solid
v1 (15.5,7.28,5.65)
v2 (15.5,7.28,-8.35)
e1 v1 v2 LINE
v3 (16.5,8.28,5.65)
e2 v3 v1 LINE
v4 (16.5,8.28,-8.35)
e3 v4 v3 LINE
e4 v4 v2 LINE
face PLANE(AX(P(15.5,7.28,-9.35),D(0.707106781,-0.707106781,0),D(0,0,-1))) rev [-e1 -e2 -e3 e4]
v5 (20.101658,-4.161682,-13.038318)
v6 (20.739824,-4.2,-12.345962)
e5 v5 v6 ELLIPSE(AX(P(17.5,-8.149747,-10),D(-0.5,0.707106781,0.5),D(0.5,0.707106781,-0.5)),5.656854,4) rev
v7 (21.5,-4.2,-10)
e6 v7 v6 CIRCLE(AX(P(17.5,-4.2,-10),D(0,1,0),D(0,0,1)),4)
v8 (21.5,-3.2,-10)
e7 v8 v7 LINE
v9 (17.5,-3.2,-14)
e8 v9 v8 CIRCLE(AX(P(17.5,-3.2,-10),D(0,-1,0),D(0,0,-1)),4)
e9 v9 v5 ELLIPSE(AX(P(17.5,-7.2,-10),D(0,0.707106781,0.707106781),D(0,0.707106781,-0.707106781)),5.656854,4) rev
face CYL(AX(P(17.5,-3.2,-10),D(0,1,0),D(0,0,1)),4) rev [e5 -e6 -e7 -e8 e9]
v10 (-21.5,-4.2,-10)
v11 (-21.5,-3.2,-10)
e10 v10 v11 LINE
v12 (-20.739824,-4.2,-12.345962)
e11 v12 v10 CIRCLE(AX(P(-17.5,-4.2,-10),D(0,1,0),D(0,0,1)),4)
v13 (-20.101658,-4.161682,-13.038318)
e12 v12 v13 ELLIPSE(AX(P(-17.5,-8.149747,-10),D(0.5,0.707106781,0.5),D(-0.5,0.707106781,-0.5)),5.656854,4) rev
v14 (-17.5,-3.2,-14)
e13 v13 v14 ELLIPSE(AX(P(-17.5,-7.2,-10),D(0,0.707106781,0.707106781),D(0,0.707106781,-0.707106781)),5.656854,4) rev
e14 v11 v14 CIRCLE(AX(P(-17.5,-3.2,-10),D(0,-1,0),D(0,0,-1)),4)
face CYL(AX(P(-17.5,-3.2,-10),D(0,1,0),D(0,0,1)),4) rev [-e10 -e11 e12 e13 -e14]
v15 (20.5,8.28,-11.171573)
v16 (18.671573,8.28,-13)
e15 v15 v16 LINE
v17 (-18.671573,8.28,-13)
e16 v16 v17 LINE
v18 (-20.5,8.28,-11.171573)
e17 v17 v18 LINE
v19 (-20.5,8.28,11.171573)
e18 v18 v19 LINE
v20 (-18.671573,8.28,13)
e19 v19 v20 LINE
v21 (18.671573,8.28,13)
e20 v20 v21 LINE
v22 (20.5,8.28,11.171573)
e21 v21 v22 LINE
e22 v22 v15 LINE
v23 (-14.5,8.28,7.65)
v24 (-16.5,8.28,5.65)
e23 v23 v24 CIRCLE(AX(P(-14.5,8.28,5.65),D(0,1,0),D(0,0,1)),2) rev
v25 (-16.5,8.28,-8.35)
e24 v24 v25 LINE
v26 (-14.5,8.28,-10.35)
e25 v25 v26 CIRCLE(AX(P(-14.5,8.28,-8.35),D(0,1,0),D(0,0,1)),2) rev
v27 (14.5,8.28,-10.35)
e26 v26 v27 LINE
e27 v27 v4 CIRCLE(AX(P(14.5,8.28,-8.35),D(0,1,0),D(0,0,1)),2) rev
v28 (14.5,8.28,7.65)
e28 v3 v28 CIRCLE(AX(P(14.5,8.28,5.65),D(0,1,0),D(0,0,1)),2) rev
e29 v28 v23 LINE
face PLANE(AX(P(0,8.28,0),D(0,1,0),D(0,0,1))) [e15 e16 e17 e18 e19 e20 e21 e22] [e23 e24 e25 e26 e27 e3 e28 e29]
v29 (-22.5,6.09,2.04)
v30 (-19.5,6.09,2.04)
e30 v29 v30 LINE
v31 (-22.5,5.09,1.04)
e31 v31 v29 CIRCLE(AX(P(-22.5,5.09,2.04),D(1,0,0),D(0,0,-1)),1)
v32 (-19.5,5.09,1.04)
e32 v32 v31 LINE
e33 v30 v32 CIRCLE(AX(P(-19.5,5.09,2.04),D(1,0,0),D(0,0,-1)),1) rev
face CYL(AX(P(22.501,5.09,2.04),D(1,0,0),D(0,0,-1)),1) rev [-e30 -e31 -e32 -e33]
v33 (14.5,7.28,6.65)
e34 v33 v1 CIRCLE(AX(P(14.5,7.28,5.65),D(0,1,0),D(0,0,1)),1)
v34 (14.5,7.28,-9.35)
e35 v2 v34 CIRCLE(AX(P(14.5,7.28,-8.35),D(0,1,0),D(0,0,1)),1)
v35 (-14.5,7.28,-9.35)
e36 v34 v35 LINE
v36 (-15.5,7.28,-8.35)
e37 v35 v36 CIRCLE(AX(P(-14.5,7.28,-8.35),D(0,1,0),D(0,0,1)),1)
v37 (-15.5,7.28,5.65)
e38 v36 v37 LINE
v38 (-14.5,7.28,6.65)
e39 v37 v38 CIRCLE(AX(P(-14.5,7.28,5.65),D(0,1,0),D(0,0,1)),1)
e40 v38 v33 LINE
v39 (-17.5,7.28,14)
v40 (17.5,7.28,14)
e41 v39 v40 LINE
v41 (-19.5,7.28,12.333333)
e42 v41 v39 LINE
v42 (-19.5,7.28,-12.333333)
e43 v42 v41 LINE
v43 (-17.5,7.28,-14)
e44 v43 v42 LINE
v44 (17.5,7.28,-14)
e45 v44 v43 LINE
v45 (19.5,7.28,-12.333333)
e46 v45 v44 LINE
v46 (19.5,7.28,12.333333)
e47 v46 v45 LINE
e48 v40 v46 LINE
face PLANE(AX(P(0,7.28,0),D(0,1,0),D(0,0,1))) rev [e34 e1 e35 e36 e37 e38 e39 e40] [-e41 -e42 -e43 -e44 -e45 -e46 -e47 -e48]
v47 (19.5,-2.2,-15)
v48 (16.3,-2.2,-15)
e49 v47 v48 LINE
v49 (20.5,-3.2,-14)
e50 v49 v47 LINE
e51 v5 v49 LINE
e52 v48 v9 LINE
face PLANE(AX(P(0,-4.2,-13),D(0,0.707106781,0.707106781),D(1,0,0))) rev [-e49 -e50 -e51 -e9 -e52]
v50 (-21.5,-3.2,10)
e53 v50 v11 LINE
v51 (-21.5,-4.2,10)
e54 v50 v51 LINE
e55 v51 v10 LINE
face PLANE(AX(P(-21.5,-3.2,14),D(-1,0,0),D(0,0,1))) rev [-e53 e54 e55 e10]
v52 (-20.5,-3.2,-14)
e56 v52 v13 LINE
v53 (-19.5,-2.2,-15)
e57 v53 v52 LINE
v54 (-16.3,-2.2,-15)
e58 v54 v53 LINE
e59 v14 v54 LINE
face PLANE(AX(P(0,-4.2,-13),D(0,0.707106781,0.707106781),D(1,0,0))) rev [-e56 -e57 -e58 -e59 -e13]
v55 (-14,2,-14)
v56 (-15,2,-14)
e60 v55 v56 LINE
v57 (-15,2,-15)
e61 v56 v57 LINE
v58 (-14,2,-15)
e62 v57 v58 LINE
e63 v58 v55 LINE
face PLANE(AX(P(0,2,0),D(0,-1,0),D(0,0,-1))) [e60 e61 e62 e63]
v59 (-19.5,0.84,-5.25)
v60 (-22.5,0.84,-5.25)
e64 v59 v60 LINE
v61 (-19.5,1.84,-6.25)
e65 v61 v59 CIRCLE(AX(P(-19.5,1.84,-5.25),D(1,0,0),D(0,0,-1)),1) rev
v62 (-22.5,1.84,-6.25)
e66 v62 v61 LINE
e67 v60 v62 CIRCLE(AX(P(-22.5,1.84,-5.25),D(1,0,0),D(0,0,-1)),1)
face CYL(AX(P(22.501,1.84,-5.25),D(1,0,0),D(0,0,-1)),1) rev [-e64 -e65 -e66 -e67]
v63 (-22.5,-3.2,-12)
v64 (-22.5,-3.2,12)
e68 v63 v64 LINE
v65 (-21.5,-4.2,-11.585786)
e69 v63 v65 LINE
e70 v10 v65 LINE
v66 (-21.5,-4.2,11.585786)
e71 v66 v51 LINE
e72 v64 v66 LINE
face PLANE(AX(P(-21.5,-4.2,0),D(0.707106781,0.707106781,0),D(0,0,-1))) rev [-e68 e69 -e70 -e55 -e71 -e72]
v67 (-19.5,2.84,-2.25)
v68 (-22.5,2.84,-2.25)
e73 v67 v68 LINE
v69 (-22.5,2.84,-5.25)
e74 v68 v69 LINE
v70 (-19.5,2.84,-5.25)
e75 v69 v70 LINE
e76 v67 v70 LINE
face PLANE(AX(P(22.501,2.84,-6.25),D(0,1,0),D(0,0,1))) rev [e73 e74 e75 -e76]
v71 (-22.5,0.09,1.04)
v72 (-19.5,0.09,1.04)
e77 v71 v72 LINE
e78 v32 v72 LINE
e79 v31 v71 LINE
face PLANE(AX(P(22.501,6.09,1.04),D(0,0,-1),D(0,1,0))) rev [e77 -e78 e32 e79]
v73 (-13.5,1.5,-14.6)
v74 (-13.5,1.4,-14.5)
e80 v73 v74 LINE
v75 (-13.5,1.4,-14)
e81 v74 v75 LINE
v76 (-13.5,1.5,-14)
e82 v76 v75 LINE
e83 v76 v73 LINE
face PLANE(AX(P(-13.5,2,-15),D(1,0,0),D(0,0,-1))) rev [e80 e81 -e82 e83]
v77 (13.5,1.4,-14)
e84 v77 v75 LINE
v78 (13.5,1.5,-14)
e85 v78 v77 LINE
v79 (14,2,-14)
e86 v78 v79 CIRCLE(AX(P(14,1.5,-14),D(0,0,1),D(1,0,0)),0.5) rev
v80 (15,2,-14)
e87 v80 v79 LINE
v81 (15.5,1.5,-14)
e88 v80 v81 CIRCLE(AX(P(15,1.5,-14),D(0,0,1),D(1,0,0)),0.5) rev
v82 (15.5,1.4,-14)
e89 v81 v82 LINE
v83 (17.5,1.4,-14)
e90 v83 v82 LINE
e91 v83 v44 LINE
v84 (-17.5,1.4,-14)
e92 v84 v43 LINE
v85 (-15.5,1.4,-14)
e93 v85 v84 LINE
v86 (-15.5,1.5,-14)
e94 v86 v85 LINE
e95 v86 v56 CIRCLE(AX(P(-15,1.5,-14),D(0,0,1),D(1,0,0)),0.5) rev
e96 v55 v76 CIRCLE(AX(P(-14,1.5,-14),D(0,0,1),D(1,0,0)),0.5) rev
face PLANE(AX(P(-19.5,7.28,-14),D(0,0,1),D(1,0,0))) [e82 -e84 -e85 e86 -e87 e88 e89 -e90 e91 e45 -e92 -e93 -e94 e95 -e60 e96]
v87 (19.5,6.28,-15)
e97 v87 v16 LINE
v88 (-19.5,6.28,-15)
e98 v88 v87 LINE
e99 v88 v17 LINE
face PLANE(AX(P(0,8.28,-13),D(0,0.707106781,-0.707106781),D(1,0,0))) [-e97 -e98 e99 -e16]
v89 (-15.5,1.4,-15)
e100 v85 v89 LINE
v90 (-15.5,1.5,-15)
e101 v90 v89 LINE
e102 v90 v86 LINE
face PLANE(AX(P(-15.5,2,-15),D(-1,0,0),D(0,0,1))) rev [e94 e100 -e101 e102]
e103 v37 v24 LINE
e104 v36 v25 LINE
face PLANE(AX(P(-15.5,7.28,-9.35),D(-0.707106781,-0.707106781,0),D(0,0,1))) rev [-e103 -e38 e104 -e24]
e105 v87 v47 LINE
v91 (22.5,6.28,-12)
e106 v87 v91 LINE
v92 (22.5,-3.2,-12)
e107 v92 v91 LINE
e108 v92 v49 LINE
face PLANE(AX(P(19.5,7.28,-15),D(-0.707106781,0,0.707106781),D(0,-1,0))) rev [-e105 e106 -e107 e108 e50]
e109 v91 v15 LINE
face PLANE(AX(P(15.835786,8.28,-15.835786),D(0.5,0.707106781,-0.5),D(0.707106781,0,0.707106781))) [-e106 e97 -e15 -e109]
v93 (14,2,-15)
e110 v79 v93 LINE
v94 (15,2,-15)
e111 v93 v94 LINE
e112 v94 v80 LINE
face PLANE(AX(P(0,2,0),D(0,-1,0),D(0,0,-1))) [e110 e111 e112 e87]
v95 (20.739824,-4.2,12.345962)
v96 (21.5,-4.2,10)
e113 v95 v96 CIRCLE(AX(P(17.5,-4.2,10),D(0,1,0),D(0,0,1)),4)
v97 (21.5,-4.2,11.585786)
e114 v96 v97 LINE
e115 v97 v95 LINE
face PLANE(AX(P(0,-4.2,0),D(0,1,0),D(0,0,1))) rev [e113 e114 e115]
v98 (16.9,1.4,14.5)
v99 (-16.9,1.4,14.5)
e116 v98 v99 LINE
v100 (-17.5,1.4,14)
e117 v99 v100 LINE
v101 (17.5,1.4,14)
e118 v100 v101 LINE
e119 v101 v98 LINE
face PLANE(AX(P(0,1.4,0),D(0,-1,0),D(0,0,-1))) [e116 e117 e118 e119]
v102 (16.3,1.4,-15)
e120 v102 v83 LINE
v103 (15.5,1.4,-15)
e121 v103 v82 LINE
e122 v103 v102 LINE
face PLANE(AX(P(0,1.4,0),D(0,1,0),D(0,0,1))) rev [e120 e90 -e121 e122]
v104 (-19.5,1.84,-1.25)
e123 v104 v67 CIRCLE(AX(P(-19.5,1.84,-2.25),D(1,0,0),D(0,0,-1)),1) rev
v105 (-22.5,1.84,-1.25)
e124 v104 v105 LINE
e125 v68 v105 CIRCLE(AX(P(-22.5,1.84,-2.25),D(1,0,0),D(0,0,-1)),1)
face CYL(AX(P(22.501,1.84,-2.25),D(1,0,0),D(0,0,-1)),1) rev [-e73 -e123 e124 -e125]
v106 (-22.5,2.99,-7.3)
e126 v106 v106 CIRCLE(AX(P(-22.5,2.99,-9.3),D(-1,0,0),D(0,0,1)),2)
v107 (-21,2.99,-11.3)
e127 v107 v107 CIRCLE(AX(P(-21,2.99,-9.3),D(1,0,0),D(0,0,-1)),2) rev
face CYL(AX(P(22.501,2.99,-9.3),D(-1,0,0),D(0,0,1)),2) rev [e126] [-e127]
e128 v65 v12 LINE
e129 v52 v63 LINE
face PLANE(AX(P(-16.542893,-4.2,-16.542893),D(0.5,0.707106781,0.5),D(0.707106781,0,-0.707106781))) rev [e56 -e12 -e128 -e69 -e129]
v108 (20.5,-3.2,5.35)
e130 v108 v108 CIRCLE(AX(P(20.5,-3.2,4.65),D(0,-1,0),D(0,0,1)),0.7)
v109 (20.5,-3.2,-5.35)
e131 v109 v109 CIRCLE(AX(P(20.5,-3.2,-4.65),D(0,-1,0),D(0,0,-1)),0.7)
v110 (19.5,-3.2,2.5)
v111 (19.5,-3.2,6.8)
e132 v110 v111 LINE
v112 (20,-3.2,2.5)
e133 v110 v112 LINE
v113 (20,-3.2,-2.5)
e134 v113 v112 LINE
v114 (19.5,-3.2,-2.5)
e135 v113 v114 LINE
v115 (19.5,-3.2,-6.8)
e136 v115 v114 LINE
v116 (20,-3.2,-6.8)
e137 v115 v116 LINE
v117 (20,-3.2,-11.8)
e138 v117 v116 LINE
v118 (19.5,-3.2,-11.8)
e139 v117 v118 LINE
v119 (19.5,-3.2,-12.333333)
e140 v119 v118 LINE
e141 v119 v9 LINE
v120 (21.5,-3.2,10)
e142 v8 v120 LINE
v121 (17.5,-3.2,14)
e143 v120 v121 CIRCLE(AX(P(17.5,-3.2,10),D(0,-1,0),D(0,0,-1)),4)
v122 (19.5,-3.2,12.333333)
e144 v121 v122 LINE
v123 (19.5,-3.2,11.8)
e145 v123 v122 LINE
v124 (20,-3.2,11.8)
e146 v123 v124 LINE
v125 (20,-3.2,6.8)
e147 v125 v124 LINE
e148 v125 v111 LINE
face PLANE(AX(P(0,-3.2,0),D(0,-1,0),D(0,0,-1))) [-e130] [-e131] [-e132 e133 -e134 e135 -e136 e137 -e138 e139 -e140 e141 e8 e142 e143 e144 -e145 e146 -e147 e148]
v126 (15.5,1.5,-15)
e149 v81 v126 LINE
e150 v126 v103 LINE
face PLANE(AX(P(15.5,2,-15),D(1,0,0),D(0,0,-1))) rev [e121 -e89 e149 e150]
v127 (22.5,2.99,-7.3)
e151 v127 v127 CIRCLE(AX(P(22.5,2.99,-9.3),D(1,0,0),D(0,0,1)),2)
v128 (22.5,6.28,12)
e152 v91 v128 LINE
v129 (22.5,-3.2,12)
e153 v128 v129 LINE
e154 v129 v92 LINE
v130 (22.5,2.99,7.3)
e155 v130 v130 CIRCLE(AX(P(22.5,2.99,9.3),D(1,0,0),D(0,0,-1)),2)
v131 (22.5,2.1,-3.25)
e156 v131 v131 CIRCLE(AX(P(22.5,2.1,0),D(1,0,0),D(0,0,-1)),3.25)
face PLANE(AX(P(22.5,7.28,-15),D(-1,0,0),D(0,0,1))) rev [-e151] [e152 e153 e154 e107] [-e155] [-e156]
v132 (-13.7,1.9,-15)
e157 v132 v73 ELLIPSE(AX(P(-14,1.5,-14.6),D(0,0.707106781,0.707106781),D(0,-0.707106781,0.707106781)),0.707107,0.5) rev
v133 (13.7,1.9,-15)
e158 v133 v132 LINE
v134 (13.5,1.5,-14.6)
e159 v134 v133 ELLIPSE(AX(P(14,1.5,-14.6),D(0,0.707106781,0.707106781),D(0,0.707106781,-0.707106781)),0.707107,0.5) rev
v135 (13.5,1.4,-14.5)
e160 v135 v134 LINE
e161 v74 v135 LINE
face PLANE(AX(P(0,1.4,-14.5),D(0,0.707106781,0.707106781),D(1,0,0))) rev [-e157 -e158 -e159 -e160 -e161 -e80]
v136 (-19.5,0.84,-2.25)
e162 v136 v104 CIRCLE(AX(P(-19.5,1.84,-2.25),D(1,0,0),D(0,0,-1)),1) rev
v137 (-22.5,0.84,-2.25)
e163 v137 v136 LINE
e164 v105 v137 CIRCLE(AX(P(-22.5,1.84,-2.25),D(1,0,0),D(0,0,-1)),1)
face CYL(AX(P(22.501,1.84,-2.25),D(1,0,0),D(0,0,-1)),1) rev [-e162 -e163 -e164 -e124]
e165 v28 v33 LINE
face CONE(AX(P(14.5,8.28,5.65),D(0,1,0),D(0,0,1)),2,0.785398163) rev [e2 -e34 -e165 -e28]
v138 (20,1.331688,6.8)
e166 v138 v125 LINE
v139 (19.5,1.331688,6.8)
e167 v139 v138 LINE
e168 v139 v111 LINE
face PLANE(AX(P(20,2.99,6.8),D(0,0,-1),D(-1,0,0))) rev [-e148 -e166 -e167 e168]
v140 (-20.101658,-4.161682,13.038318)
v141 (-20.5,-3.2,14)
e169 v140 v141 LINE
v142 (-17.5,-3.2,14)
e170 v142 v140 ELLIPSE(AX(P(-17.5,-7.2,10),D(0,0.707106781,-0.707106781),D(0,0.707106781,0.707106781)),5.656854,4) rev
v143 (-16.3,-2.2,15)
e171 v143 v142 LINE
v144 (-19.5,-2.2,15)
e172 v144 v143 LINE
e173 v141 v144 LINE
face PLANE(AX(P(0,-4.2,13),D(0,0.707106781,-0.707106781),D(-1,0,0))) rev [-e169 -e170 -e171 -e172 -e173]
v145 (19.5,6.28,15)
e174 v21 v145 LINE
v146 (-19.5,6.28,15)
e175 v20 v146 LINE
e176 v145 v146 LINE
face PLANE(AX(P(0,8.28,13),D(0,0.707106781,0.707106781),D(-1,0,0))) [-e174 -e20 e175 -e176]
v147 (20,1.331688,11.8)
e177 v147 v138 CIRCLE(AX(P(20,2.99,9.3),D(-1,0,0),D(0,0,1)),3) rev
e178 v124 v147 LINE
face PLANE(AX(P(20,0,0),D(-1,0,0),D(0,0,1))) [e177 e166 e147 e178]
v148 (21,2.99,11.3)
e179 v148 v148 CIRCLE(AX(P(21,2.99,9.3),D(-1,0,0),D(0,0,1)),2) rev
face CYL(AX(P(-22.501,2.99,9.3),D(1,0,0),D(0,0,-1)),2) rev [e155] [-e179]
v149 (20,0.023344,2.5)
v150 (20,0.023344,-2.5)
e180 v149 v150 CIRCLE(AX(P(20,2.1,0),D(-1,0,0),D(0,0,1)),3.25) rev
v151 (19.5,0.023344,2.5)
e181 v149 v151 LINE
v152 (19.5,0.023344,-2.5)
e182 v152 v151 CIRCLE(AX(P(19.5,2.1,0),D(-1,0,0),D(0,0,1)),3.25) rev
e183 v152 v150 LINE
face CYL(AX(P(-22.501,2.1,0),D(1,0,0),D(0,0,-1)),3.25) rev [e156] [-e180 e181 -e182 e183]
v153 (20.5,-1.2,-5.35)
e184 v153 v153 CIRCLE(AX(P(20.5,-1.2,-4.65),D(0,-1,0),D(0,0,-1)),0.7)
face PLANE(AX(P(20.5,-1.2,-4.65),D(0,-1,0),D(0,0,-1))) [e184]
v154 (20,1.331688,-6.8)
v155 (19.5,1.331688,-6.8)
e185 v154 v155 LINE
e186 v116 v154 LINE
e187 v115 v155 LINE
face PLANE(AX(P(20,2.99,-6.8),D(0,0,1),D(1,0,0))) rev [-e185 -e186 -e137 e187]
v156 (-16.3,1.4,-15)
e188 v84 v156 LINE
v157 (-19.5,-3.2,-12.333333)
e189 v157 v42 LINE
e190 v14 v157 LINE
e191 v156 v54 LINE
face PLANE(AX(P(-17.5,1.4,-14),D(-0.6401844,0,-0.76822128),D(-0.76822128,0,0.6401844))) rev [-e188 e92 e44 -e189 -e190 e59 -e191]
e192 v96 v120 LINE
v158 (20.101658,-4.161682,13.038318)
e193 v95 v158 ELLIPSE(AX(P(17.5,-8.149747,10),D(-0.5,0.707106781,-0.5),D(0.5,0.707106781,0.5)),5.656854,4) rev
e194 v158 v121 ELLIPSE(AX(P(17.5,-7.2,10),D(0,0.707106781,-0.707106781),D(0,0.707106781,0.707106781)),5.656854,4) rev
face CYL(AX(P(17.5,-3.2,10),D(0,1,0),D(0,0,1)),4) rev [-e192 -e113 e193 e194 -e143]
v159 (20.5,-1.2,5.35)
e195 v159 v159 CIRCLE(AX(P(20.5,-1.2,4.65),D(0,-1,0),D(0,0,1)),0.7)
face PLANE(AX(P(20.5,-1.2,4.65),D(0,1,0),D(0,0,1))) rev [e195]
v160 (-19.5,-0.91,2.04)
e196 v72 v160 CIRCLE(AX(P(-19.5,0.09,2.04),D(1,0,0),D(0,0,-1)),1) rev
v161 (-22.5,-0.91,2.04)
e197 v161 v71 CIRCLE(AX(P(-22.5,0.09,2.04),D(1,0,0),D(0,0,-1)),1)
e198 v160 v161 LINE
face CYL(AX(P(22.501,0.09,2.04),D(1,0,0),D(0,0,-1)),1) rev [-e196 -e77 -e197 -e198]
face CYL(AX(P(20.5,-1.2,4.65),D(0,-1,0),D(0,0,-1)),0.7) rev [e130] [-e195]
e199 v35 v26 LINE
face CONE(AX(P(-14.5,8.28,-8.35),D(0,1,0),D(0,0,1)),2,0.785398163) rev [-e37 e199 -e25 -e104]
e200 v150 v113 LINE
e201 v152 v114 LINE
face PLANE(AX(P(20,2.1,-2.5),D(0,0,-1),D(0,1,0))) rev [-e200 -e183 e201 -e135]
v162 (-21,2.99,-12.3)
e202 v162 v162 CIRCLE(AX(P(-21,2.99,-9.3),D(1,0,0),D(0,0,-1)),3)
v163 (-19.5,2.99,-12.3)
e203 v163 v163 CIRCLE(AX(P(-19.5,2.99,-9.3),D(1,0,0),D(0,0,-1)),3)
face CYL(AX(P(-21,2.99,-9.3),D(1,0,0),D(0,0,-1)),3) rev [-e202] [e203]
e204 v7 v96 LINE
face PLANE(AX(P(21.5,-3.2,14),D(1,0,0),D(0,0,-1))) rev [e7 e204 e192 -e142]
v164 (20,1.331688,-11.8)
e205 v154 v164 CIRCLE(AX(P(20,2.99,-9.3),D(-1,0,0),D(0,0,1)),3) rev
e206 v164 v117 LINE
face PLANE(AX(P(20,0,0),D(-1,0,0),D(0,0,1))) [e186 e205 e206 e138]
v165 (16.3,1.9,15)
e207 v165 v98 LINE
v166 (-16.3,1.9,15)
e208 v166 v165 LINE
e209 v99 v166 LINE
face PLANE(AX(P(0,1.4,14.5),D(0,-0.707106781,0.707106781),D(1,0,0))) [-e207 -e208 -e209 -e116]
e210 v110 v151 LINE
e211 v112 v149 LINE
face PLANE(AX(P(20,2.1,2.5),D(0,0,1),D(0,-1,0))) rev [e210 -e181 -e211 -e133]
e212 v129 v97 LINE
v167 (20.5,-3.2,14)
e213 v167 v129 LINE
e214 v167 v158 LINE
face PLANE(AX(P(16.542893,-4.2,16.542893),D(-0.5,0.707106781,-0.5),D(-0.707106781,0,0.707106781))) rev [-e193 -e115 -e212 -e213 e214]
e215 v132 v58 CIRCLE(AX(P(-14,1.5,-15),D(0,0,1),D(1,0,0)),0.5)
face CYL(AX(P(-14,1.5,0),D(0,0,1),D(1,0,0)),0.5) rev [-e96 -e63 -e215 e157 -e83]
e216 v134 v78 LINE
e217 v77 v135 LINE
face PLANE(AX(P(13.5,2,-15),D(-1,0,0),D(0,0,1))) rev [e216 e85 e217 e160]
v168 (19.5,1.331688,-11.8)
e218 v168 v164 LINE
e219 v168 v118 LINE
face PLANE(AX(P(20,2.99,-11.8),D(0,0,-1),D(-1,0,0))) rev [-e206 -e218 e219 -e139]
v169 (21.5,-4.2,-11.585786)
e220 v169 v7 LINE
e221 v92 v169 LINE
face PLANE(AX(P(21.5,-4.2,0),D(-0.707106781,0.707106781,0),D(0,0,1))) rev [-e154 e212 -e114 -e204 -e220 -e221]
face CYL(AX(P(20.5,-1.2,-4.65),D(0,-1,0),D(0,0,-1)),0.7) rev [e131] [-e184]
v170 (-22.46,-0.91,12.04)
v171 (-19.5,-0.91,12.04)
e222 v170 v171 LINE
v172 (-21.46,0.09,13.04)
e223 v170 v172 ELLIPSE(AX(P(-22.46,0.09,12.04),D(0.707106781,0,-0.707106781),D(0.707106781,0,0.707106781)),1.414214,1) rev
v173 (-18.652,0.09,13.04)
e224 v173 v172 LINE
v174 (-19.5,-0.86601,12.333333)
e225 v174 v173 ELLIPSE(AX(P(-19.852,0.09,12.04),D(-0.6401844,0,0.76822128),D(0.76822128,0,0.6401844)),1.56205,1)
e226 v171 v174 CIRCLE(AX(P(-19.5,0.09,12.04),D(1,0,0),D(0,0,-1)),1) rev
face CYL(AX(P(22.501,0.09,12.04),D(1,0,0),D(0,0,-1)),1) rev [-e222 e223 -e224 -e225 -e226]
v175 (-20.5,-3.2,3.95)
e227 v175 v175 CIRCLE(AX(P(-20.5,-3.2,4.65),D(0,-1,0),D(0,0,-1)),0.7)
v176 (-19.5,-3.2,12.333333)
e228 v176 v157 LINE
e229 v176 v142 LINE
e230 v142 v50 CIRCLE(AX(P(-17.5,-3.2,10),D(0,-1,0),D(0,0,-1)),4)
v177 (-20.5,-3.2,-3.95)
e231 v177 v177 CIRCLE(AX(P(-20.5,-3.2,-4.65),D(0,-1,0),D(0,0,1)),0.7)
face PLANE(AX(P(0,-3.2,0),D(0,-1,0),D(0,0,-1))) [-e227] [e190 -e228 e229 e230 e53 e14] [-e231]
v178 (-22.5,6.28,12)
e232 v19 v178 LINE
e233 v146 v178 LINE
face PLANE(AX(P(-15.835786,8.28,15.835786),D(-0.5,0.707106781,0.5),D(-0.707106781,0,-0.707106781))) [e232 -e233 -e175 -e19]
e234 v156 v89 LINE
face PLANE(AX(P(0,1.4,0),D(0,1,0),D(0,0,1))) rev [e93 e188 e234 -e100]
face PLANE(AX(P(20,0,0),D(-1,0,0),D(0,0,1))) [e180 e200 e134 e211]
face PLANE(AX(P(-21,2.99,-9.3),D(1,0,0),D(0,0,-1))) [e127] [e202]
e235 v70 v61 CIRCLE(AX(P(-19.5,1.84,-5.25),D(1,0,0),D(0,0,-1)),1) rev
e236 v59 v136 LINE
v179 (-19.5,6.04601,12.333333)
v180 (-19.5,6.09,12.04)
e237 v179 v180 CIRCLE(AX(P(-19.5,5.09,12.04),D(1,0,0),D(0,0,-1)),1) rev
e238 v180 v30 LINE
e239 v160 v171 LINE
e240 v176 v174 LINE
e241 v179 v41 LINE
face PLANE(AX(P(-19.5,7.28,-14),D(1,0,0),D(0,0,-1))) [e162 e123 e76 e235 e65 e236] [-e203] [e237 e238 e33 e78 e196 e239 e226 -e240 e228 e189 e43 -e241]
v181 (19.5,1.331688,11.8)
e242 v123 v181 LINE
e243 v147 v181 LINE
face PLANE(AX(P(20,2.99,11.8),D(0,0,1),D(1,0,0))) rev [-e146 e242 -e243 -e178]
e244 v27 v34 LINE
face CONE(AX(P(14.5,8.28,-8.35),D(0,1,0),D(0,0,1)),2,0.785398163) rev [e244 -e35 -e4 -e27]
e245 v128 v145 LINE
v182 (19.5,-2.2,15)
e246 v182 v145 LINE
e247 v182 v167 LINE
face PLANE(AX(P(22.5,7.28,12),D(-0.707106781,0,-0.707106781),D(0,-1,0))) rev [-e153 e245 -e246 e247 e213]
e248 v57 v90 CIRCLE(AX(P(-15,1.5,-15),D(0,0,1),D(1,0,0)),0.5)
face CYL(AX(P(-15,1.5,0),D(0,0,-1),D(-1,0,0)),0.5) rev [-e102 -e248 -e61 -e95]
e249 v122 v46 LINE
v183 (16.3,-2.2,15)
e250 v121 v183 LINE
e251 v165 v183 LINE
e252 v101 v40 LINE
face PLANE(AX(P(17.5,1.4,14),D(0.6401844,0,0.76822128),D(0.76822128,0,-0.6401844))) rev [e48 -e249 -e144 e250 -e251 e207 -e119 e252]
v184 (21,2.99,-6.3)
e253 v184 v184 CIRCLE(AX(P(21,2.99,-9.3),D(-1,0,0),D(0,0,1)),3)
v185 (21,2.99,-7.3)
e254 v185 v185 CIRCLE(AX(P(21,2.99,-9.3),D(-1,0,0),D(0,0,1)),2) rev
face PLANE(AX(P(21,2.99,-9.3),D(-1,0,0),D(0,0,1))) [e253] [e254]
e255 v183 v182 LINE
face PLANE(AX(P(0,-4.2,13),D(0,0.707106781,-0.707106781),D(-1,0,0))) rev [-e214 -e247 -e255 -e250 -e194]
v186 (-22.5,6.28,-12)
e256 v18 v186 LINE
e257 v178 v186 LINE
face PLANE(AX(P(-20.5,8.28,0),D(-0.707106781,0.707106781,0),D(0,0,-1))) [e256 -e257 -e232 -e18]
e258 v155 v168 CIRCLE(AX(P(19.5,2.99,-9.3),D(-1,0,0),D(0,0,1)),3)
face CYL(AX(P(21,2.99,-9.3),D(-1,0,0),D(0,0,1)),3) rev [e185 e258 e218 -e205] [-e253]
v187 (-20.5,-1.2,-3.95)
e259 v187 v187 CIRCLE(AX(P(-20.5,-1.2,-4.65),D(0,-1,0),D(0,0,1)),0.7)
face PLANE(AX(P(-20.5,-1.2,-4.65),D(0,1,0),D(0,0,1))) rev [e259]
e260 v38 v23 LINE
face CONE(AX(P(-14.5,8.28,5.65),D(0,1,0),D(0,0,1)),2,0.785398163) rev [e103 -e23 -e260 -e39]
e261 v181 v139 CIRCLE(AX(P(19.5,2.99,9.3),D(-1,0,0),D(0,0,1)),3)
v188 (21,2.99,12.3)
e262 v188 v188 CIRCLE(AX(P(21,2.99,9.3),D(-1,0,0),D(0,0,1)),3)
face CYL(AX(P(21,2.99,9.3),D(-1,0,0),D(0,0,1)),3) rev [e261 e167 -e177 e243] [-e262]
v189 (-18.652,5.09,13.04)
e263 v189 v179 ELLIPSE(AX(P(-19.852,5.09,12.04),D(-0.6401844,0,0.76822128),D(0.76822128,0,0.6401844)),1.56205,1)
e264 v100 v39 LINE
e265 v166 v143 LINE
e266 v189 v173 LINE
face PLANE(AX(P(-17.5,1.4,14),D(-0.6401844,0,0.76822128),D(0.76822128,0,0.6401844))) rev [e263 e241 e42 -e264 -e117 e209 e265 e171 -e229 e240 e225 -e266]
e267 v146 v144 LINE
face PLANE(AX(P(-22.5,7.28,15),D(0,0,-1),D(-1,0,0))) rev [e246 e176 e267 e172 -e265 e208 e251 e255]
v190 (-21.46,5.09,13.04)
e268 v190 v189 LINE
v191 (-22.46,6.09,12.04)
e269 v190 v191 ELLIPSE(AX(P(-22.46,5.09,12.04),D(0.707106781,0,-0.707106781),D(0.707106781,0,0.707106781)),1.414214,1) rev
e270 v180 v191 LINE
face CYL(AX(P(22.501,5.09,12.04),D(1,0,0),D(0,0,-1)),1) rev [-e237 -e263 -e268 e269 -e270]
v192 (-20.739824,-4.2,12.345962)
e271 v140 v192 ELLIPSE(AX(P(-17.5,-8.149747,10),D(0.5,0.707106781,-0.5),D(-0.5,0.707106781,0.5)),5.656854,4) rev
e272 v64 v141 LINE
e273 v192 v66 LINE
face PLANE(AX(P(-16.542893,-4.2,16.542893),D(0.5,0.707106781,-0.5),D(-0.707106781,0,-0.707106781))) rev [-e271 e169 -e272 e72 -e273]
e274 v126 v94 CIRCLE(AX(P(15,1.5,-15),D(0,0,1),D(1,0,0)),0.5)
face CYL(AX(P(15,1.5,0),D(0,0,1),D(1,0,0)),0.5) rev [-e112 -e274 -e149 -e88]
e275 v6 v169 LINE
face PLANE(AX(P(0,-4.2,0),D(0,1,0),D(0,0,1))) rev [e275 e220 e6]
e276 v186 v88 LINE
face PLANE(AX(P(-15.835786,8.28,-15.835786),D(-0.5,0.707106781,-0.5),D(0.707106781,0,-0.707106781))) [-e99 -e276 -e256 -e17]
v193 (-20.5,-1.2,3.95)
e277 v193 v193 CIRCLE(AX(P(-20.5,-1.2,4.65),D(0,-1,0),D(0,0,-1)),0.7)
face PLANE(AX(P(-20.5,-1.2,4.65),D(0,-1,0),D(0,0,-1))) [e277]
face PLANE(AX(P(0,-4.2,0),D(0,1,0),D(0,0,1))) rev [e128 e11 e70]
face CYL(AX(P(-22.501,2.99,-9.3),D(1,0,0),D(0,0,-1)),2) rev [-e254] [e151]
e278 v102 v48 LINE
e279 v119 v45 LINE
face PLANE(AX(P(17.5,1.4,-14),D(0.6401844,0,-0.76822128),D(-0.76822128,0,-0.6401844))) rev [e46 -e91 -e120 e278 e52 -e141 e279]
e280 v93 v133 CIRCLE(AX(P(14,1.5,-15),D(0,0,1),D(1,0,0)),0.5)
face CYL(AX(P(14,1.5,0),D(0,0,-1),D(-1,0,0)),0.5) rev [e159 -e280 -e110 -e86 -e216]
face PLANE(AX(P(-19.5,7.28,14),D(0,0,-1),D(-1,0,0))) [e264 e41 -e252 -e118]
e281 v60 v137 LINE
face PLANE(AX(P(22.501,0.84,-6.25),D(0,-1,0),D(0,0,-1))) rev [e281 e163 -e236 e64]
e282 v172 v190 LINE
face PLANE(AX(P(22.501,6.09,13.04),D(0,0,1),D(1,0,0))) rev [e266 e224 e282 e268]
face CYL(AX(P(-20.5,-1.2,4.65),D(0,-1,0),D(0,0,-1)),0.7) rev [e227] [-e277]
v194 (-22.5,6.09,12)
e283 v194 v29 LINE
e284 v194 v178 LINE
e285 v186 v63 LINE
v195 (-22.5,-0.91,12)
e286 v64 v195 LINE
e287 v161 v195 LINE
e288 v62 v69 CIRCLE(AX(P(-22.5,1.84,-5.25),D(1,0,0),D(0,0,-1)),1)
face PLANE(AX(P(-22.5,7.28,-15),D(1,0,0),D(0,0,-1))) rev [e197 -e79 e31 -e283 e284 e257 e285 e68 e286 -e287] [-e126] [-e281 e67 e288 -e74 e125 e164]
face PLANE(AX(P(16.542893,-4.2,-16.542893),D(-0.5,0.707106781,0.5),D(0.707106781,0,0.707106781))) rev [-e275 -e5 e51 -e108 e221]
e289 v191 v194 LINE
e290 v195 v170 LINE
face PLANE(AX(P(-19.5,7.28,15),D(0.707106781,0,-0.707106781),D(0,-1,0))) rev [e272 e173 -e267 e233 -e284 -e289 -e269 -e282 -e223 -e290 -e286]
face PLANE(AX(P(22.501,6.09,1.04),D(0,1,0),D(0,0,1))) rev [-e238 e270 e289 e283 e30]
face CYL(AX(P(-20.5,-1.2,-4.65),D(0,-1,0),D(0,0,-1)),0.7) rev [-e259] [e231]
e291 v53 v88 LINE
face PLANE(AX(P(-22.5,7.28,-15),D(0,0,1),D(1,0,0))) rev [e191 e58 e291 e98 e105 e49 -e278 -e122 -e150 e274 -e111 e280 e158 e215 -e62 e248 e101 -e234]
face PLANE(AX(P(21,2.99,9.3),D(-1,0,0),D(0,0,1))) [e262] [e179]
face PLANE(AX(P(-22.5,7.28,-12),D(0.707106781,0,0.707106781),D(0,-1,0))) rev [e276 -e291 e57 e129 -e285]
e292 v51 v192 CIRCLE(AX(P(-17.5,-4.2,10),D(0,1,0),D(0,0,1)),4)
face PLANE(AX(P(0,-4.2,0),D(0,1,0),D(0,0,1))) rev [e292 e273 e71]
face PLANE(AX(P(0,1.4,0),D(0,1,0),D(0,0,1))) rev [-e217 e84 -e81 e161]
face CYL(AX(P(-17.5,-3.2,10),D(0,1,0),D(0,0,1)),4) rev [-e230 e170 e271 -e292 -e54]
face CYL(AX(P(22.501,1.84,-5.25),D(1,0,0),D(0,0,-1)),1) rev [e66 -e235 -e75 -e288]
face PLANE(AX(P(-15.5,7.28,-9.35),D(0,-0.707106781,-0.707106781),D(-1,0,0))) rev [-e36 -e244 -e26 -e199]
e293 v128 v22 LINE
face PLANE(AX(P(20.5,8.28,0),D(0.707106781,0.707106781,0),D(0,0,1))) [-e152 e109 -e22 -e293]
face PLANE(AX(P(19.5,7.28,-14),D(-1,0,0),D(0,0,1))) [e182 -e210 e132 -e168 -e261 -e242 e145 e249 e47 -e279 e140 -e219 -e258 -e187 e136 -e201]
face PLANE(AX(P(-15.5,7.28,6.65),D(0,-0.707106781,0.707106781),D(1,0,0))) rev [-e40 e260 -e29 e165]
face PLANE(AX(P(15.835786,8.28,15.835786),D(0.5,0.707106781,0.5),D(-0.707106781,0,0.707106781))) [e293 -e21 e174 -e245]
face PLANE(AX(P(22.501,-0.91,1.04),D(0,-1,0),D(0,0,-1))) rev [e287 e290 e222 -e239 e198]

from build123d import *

# Parameters (mm, degrees)
SKETCH_1_W            = 45
SKETCH_1_H            = 30
SKETCH_1_W_2          = 39
SKETCH_1_H_2          = 28
EXTRUDE_1_DEPTH       = 7.28
SKETCH_2_W            = 45
SKETCH_2_H            = 30
SKETCH_2_W_2          = 31
SKETCH_2_H_2          = 16
EXTRUDE_2_DEPTH       = 1
CUT_EXTRUDE_1_DEPTH   = 1.4
EXTRUDE_3_DEPTH       = 4.2
EXTRUDE_4_DEPTH       = 11.48
SKETCH_5_W            = 2
SKETCH_5_H            = 1
CUT_EXTRUDE_3_DEPTH   = 0.6
CUT_EXTRUDE_5_REACH   = 50.151
SKETCH_7_R            = 2
CUT_EXTRUDE_6_REACH   = 50.151
SKETCH_8_R            = 2
CUT_EXTRUDE_4_REACH   = 50.151
SKETCH_6_R            = 3.25
CUT_EXTRUDE_7_REACH   = 50.151
SKETCH_9_W            = 5
SKETCH_9_H            = 2
CUT_EXTRUDE_8_REACH   = 50.151
SKETCH_10_W           = 12
SKETCH_10_H           = 7
SKETCH_11_R           = 3
CUT_EXTRUDE_9_DEPTH   = 1.5
CUT_EXTRUDE_START     = -1.5
SKETCH_12_R           = 3
CUT_EXTRUDE_10_DEPTH  = 1.5
FILLET_3_R            = 1
CHAMFER_2_SIZE        = 1
FILLET_6_R            = 1
FILLET_7_R            = 1
FILLET_8_R            = 0.5
CHAMFER_3_SIZE        = 0.5
CHAMFER_5_SIZE        = 0.5
SKETCH_16_W           = 5
SKETCH_16_H           = 7.19
SKETCH_16_H_2         = 6.3
CUT_EXTRUDE_11_DEPTH  = 0.5
SKETCH_17_W           = 43
SKETCH_17_H           = 28
CUT_EXTRUDE_12_DEPTH  = 1
FILLET_11_R           = 4
SKETCH_18_R           = 0.7
CUT_EXTRUDE_13_DEPTH  = 2
CHAMFER_6_SIZE        = 3
CHAMFER_7_SIZE        = 2
CHAMFER_8_SIZE        = 1
CHAMFER_START         = -15
CHAMFER_9_OUTLINE_W   = 44
CHAMFER_9_OUTLINE_H   = 23.162236636
CHAMFER_9_DEPTH       = 2.837763364
CHAMFER_START_2       = 5.222539674
CHAMFER_9_2_OUTLINE_W = 44
CHAMFER_9_2_OUTLINE_H = 2.837763364
CHAMFER_9_2_DEPTH     = 9.82469263


with BuildPart() as part:
    # 草图1 → 凸台-拉伸1 (new body)
    with BuildSketch(Plane(origin=(0, 0, 0), x_dir=(1, 0, 0), z_dir=(0, 1, 0))):
        Rectangle(SKETCH_1_W, SKETCH_1_H)
        Rectangle(SKETCH_1_W_2, SKETCH_1_H_2, mode=Mode.SUBTRACT)
    extrude(amount=EXTRUDE_1_DEPTH)

    # 草图2 → 凸台-拉伸2 (add)
    with BuildSketch(Plane(origin=(0, 7.28, 0), x_dir=(1, 0, 0), z_dir=(0, 1, 0))):
        Rectangle(SKETCH_2_W, SKETCH_2_H)
        with Locations((0, 1.35)):
            Rectangle(SKETCH_2_W_2, SKETCH_2_H_2, mode=Mode.SUBTRACT)
    extrude(amount=EXTRUDE_2_DEPTH)

    # 草图3 → 切除-拉伸1 (cut)
    with BuildSketch(Plane.XZ):
        Polygon((-17.5, 14), (-16.3, 15), (16.3, 15), (17.5, 14), align=None)
        Polygon((17.5, -14), (16.3, -15), (-16.3, -15), (-17.5, -14), align=None)
    extrude(amount=-CUT_EXTRUDE_1_DEPTH, mode=Mode.SUBTRACT)

    # 草图14 → 凸台-拉伸3 (add)
    with BuildSketch(Plane(origin=(0, 0, 0), x_dir=(-1, 0, 0), z_dir=(0, -1, 0))):
        Polygon((22.5, -15), (16.3, -15), (17.5, -14), (19.5, -14), (19.5, 14), (17.5, 14), (16.3, 15), (22.5, 15), align=None)
        Polygon((-16.3, 15), (-17.5, 14), (-19.5, 14), (-19.5, -14), (-17.5, -14), (-16.3, -15), (-22.5, -15), (-22.5, 15), align=None)
    extrude(amount=EXTRUDE_3_DEPTH)

    # 草图15 → 凸台-拉伸4 (add)
    with BuildSketch(Plane.XZ.offset(-7.28)):
        Polygon((17.5, -14), (19.5, -12.333333333), (19.5, -14), align=None)
        Polygon((-19.5, -14), (-19.5, -12.333333333), (-17.5, -14), align=None)
        Polygon((-17.5, 14), (-19.5, 12.333333333), (-19.5, 14), align=None)
        Polygon((19.5, 14), (19.5, 12.333333333), (17.5, 14), align=None)
    extrude(amount=EXTRUDE_4_DEPTH)

    # 草图5 → 切除-拉伸3 (cut)
    with BuildSketch(Plane.XZ.offset(-1.4)):
        with Locations((14.5, -14.5)):
            Rectangle(SKETCH_5_W, SKETCH_5_H)
        with Locations((-14.5, -14.5)):
            Rectangle(SKETCH_5_W, SKETCH_5_H)
    extrude(amount=-CUT_EXTRUDE_3_DEPTH, mode=Mode.SUBTRACT)

    # 草图7 → 切除-拉伸5 (cut, up to next)
    with BuildSketch(Plane(origin=(22.5, 0, 0), x_dir=(0, 0, -1), z_dir=(1, 0, 0)), mode=Mode.PRIVATE) as cut_extrude_5_sk1:
        with Locations((-9.3, 2.99)):
            Circle(SKETCH_7_R)
    cut_extrude_5_tool1 = extrude(cut_extrude_5_sk1.sketch, amount=-CUT_EXTRUDE_5_REACH, mode=Mode.PRIVATE) & part.part
    # 草图7 → 切除-拉伸5 (cut, up to next)
    with BuildSketch(Plane(origin=(22.5, 0, 0), x_dir=(0, 0, -1), z_dir=(1, 0, 0)), mode=Mode.PRIVATE) as cut_extrude_5_sk2:
        with Locations(Location((9.3, 2.99, 0), (0, 0, 180))):
            Circle(SKETCH_7_R)
    cut_extrude_5_tool2 = extrude(cut_extrude_5_sk2.sketch, amount=-CUT_EXTRUDE_5_REACH, mode=Mode.PRIVATE) & part.part
    add(cut_extrude_5_tool1.solids().sort_by_distance((22.5, 2.99, 9.3))[0], mode=Mode.SUBTRACT)
    add(cut_extrude_5_tool2.solids().sort_by_distance((22.5, 2.99, -9.3))[0], mode=Mode.SUBTRACT)

    # 草图8 → 切除-拉伸6 (cut, up to next)
    with BuildSketch(Plane.ZY.offset(22.5), mode=Mode.PRIVATE) as cut_extrude_6_sk1:
        with Locations((-9.3, 2.99)):
            Circle(SKETCH_8_R)
    cut_extrude_6_tool1 = extrude(cut_extrude_6_sk1.sketch, amount=-CUT_EXTRUDE_6_REACH, mode=Mode.PRIVATE) & part.part
    add(cut_extrude_6_tool1.solids().sort_by_distance((-22.5, 2.99, -9.3))[0], mode=Mode.SUBTRACT)

    # 草图6 → 切除-拉伸4 (cut, up to next)
    with BuildSketch(Plane(origin=(22.5, 0, 0), x_dir=(0, 0, -1), z_dir=(1, 0, 0)), mode=Mode.PRIVATE) as cut_extrude_4_sk1:
        with Locations((0, 2.1)):
            Circle(SKETCH_6_R)
    cut_extrude_4_tool1 = extrude(cut_extrude_4_sk1.sketch, amount=-CUT_EXTRUDE_4_REACH, mode=Mode.PRIVATE) & part.part
    add(cut_extrude_4_tool1.solids().sort_by_distance((22.5, 2.1, 0))[0], mode=Mode.SUBTRACT)

    # 草图9 → 切除-拉伸7 (cut, up to next)
    with BuildSketch(Plane.ZY.offset(22.5), mode=Mode.PRIVATE) as cut_extrude_7_sk1:
        with Locations((-3.75, 1.84)):
            Rectangle(SKETCH_9_W, SKETCH_9_H)
    cut_extrude_7_tool1 = extrude(cut_extrude_7_sk1.sketch, amount=-CUT_EXTRUDE_7_REACH, mode=Mode.PRIVATE) & part.part
    add(cut_extrude_7_tool1.solids().sort_by_distance((-22.5, 1.84, -3.75))[0], mode=Mode.SUBTRACT)

    # 草图10 → 切除-拉伸8 (cut, up to next)
    with BuildSketch(Plane.ZY.offset(22.5), mode=Mode.PRIVATE) as cut_extrude_8_sk1:
        with Locations((7.04, 2.59)):
            Rectangle(SKETCH_10_W, SKETCH_10_H)
    cut_extrude_8_tool1 = extrude(cut_extrude_8_sk1.sketch, amount=-CUT_EXTRUDE_8_REACH, mode=Mode.PRIVATE) & part.part
    add(cut_extrude_8_tool1.solids().sort_by_distance((-22.5, 2.59, 7.04))[0], mode=Mode.SUBTRACT)

    # 草图11 → 切除-拉伸9 (cut)
    with BuildSketch(Plane.ZY.offset(-19.5)):
        with Locations((-9.3, 2.99)):
            Circle(SKETCH_11_R)
        with Locations((9.3, 2.99)):
            Circle(SKETCH_11_R)
    extrude(amount=-CUT_EXTRUDE_9_DEPTH, mode=Mode.SUBTRACT)

    # 草图12 → 切除-拉伸10 (cut)
    with BuildSketch(Plane(origin=(-19.5, 0, 0), x_dir=(0, 0, -1), z_dir=(1, 0, 0)).offset(CUT_EXTRUDE_START)):
        with Locations(Location((9.3, 2.99, 0), (0, 0, 180))):
            Circle(SKETCH_12_R)
    extrude(amount=CUT_EXTRUDE_10_DEPTH, mode=Mode.SUBTRACT)

    # 圆角3
    fillet_3_edges = [part.edges().sort_by_distance(p)[0] for p in [
        (15.5, 7.78, -9.35),
        (-15.5, 7.78, -9.35),
        (-15.5, 7.78, 6.65),
        (15.5, 7.78, 6.65),
    ]]
    fillet(fillet_3_edges, radius=FILLET_3_R)

    # 倒角2
    chamfer_2_edges = [part.edges().sort_by_distance(p)[0] for p in [
        (0, 8.28, 6.65),
        (15.207106781, 8.28, 6.357106781),
        (-15.207106781, 8.28, 6.357106781),
        (15.5, 8.28, -1.35),
        (-15.5, 8.28, -1.35),
        (15.207106781, 8.28, -9.057106781),
        (-15.207106781, 8.28, -9.057106781),
        (0, 8.28, -9.35),
    ]]
    chamfer(chamfer_2_edges, length=CHAMFER_2_SIZE - 0.0001)  # a hair under: the kernel refuses the full size

    # 圆角6
    # the kernel refuses this fillet: 1 mm, written as the material it adds along each edge
    with BuildSketch(Plane(origin=(-22.5, 6.09, 13.04), x_dir=(0, -1, 0), z_dir=(1, 0, 0))) as fillet_6_piece_1_section:
        with BuildLine():
            CenterArc((FILLET_6_R, FILLET_6_R), FILLET_6_R, 180, 90)
            Line((0, FILLET_6_R), (0, 0))
            Line((0, 0), (FILLET_6_R, 0))
        make_face()
    fillet_6_piece_1 = extrude(amount=6.348, mode=Mode.PRIVATE)
    fillet_6_piece_1 = split(fillet_6_piece_1, bisect_by=Plane(origin=(-20.92295082, 6.09, 11.147540984), z_dir=(-0.6401843996644782, 0, 0.7682212795973774)), keep=Keep.TOP, mode=Mode.PRIVATE)
    fillet_6_piece_1 = split(fillet_6_piece_1, bisect_by=Plane(origin=(-19.5, 6.09, 13.04), z_dir=(-1, 0, 0)), keep=Keep.TOP, mode=Mode.PRIVATE)
    add(fillet_6_piece_1)
    with BuildSketch(Plane(origin=(-22.5, 6.09, 13.04), x_dir=(0, -1, 0), z_dir=(1, 0, 0))) as fillet_6_piece_2_section:
        with BuildLine():
            CenterArc((FILLET_6_R, FILLET_6_R), FILLET_6_R, 180, 90)
            Line((0, FILLET_6_R), (0, 0))
            Line((0, 0), (FILLET_6_R, 0))
        make_face()
    fillet_6_piece_2 = extrude(amount=6.348, mode=Mode.PRIVATE)
    fillet_6_piece_2 = split(fillet_6_piece_2, bisect_by=Plane(origin=(-20.92295082, 6.09, 11.147540984), z_dir=(0.6401843996644782, 0, -0.7682212795973774)), keep=Keep.TOP, mode=Mode.PRIVATE)
    fillet_6_piece_2 = split(fillet_6_piece_2, bisect_by=Plane(origin=(-19.5, 6.09, 13.04), z_dir=(-1, 0, 0)), keep=Keep.TOP, mode=Mode.PRIVATE)
    add(fillet_6_piece_2)
    with BuildSketch(Plane(origin=(-22.5, 6.09, 13.04), x_dir=(0, -1, 0), z_dir=(1, 0, 0))) as fillet_6_piece_3_section:
        with BuildLine():
            CenterArc((FILLET_6_R, FILLET_6_R), FILLET_6_R, 180, 90)
            Line((0, FILLET_6_R), (0, 0))
            Line((0, 0), (FILLET_6_R, 0))
        make_face()
    fillet_6_piece_3 = extrude(amount=6.348, mode=Mode.PRIVATE)
    fillet_6_piece_3 = split(fillet_6_piece_3, bisect_by=Plane(origin=(-20.92295082, 6.09, 11.147540984), z_dir=(-0.6401843996644782, 0, 0.7682212795973774)), keep=Keep.TOP, mode=Mode.PRIVATE)
    fillet_6_piece_3 = split(fillet_6_piece_3, bisect_by=Plane(origin=(-19.5, 6.09, 13.04), z_dir=(1, 0, 0)), keep=Keep.TOP, mode=Mode.PRIVATE)
    add(fillet_6_piece_3)
    with BuildSketch(Plane(origin=(-22.5, 6.09, 1.04), x_dir=(0, -1, 0), z_dir=(1, 0, 0))) as fillet_6_piece_4:
        with BuildLine():
            CenterArc((FILLET_6_R, -FILLET_6_R), FILLET_6_R, 90, 90)
            Line((0, -FILLET_6_R), (0, 0))
            Line((0, 0), (FILLET_6_R, 0))
        make_face()
    extrude(amount=3)
    with BuildSketch(Plane(origin=(-22.5, -0.91, 1.04), x_dir=(0, 1, 0), z_dir=(1, 0, 0))) as fillet_6_piece_5:
        with BuildLine():
            CenterArc((FILLET_6_R, FILLET_6_R), FILLET_6_R, 180, 90)
            Line((0, FILLET_6_R), (0, 0))
            Line((0, 0), (FILLET_6_R, 0))
        make_face()
    extrude(amount=3)
    with BuildSketch(Plane(origin=(-22.5, -0.91, 13.04), x_dir=(0, 0, -1), z_dir=(1, 0, 0))) as fillet_6_piece_6_section:
        with BuildLine():
            CenterArc((FILLET_6_R, FILLET_6_R), FILLET_6_R, 180, 90)
            Line((0, FILLET_6_R), (0, 0))
            Line((0, 0), (FILLET_6_R, 0))
        make_face()
    fillet_6_piece_6 = extrude(amount=6.348, mode=Mode.PRIVATE)
    fillet_6_piece_6 = split(fillet_6_piece_6, bisect_by=Plane(origin=(-20.92295082, -0.91, 11.147540984), z_dir=(-0.6401843996644782, 0, 0.7682212795973774)), keep=Keep.TOP, mode=Mode.PRIVATE)
    fillet_6_piece_6 = split(fillet_6_piece_6, bisect_by=Plane(origin=(-19.5, -0.91, 13.04), z_dir=(-1, 0, 0)), keep=Keep.TOP, mode=Mode.PRIVATE)
    add(fillet_6_piece_6)
    with BuildSketch(Plane(origin=(-22.5, -0.91, 13.04), x_dir=(0, 0, -1), z_dir=(1, 0, 0))) as fillet_6_piece_7_section:
        with BuildLine():
            CenterArc((FILLET_6_R, FILLET_6_R), FILLET_6_R, 180, 90)
            Line((0, FILLET_6_R), (0, 0))
            Line((0, 0), (FILLET_6_R, 0))
        make_face()
    fillet_6_piece_7 = extrude(amount=6.348, mode=Mode.PRIVATE)
    fillet_6_piece_7 = split(fillet_6_piece_7, bisect_by=Plane(origin=(-20.92295082, -0.91, 11.147540984), z_dir=(-0.6401843996644782, 0, 0.7682212795973774)), keep=Keep.TOP, mode=Mode.PRIVATE)
    fillet_6_piece_7 = split(fillet_6_piece_7, bisect_by=Plane(origin=(-19.5, -0.91, 13.04), z_dir=(1, 0, 0)), keep=Keep.TOP, mode=Mode.PRIVATE)
    add(fillet_6_piece_7)
    with BuildSketch(Plane(origin=(-22.5, -0.91, 13.04), x_dir=(0, 0, -1), z_dir=(1, 0, 0))) as fillet_6_piece_8_section:
        with BuildLine():
            CenterArc((FILLET_6_R, FILLET_6_R), FILLET_6_R, 180, 90)
            Line((0, FILLET_6_R), (0, 0))
            Line((0, 0), (FILLET_6_R, 0))
        make_face()
    fillet_6_piece_8 = extrude(amount=6.348, mode=Mode.PRIVATE)
    fillet_6_piece_8 = split(fillet_6_piece_8, bisect_by=Plane(origin=(-20.92295082, -0.91, 11.147540984), z_dir=(0.6401843996644782, 0, -0.7682212795973774)), keep=Keep.TOP, mode=Mode.PRIVATE)
    fillet_6_piece_8 = split(fillet_6_piece_8, bisect_by=Plane(origin=(-19.5, -0.91, 13.04), z_dir=(-1, 0, 0)), keep=Keep.TOP, mode=Mode.PRIVATE)
    add(fillet_6_piece_8)

    # 圆角7
    fillet_7_edges = [part.edges().sort_by_distance(p)[0] for p in [
        (-21, 2.84, -1.25),
        (-21, 0.84, -1.25),
        (-21, 2.84, -6.25),
        (-21, 0.84, -6.25),
    ]]
    fillet(fillet_7_edges, radius=FILLET_7_R - 0.0001)  # a hair under: the kernel refuses the full size

    # 圆角8
    fillet_8_edges = [part.edges().sort_by_distance(p)[0] for p in [
        (15.5, 2, -14.5),
        (13.5, 2, -14.5),
        (-15.5, 2, -14.5),
        (-13.5, 2, -14.5),
    ]]
    fillet(fillet_8_edges, radius=FILLET_8_R)

    # 倒角3
    chamfer_3_edges = [part.edges().sort_by_distance(p)[0] for p in [
        (0, 1.4, 15),
    ]]
    chamfer(chamfer_3_edges, length=CHAMFER_3_SIZE)

    # 倒角5
    chamfer_5_edges = [part.edges().sort_by_distance(p)[0] for p in [
        (0, 1.4, -15),
    ]]
    chamfer(chamfer_5_edges, length=CHAMFER_5_SIZE)

    # 草图16 → 切除-拉伸11 (cut)
    with BuildSketch(Plane.ZY.offset(-19.5)):
        with Locations((-9.3, -0.605)):
            Rectangle(SKETCH_16_W, SKETCH_16_H)
        with Locations((0, -1.05)):
            Rectangle(SKETCH_16_W, SKETCH_16_H_2)
        with Locations((9.3, -0.605)):
            Rectangle(SKETCH_16_W, SKETCH_16_H)
    extrude(amount=-CUT_EXTRUDE_11_DEPTH, mode=Mode.SUBTRACT)

    # 草图17 → 切除-拉伸12 (cut)
    with BuildSketch(Plane(origin=(0, -4.2, 0), x_dir=(-1, 0, 0), z_dir=(0, -1, 0))):
        Rectangle(SKETCH_17_W, SKETCH_17_H)
    extrude(amount=-CUT_EXTRUDE_12_DEPTH, mode=Mode.SUBTRACT)

    # 圆角11
    fillet_11_edges = [part.edges().sort_by_distance(p)[0] for p in [
        (-21.5, -3.7, -14),
        (-21.5, -3.7, 14),
        (21.5, -3.7, 14),
        (21.5, -3.7, -14),
    ]]
    fillet(fillet_11_edges, radius=FILLET_11_R - 0.0001)  # a hair under: the kernel refuses the full size

    # 草图18 → 切除-拉伸13 (cut)
    with BuildSketch(Plane.XZ.offset(3.2)):
        with Locations(Location((20.5, -4.65, 0), (0, 0, 270))):
            Circle(SKETCH_18_R)
        with Locations(Location((20.5, 4.65, 0), (0, 0, 90))):
            Circle(SKETCH_18_R)
        with Locations(Location((-20.5, 4.65, 0), (0, 0, 270))):
            Circle(SKETCH_18_R)
        with Locations(Location((-20.5, -4.65, 0), (0, 0, 90))):
            Circle(SKETCH_18_R)
    extrude(amount=-CUT_EXTRUDE_13_DEPTH, mode=Mode.SUBTRACT)

    # 倒角6
    # the kernel refuses this chamfer: 3 mm, written as the material it takes off along each edge
    with BuildSketch(Plane(origin=(-22.5, -11.915048964, 15), x_dir=(0, 0, -1), z_dir=(0, 1, 0)), Plane(origin=(22.5, 15.995048964, -15), x_dir=(-1, 0, 0), z_dir=(0, -1, 0)), Plane(origin=(-22.5, -11.915048964, -15), x_dir=(1, 0, 0), z_dir=(0, 1, 0))) as chamfer_6_piece_1:
        Polygon((CHAMFER_6_SIZE, 0), (0, -CHAMFER_6_SIZE), (0, 0), align=None)
    extrude(amount=27.910097928, mode=Mode.SUBTRACT)
    with BuildSketch(Plane(origin=(22.5, 15.995048964, 15), x_dir=(-1, 0, 0), z_dir=(0, -1, 0))) as chamfer_6_piece_2:
        Polygon((CHAMFER_6_SIZE, 0), (0, CHAMFER_6_SIZE), (0, 0), align=None)
    extrude(amount=27.910097928, mode=Mode.SUBTRACT)

    # 倒角7
    chamfer_7_edges = [part.edges().sort_by_distance(p)[0] for p in [
        (0, 8.28, 15),
        (-22.5, 8.28, 0),
        (22.5, 8.28, 0),
        (0, 8.28, -15),
        (-21, 8.28, -13.5),
        (21, 8.28, -13.5),
        (21, 8.28, 13.5),
        (-21, 8.28, 13.5),
    ]]
    chamfer(chamfer_7_edges, length=CHAMFER_7_SIZE)

    # 倒角8
    # the kernel refuses this chamfer: 1 mm, written as the material it takes off along each edge
    with BuildSketch(Plane(origin=(-22.5, -4.2, -14.571682988), x_dir=(1, 0, 0), z_dir=(0, 0, 1)), Plane(origin=(22.5, -4.2, 14.571682988), x_dir=(-1, 0, 0), z_dir=(0, 0, -1))) as chamfer_8_piece_1:
        Polygon((CHAMFER_8_SIZE, 0), (0, CHAMFER_8_SIZE), (0, 0), align=None)
    extrude(amount=29.143365976, mode=Mode.SUBTRACT)
    with BuildSketch(Plane(origin=(-24.31845448, -4.2, -10.18154552), x_dir=(0.7071067811865476, 0, 0.7071067811865476), z_dir=(0.7071067811865476, 0, -0.7071067811865476)), Plane(origin=(17.68154552, -4.2, -16.81845448), x_dir=(-0.7071067811865476, 0, 0.7071067811865476), z_dir=(0.7071067811865476, 0, 0.7071067811865476)), Plane(origin=(17.68154552, -4.2, 16.81845448), x_dir=(0, 1, 0), z_dir=(0.7071067811865476, 0, -0.7071067811865476))) as chamfer_8_piece_2:
        Polygon((CHAMFER_8_SIZE, 0), (0, -CHAMFER_8_SIZE), (0, 0), align=None)
    extrude(amount=9.386006663, mode=Mode.SUBTRACT)
    with BuildSketch(Plane(origin=(-17.68154552, -4.2, 16.81845448), x_dir=(0, 1, 0), z_dir=(-0.7071067811865476, 0, -0.7071067811865476))) as chamfer_8_piece_3:
        Polygon((CHAMFER_8_SIZE, 0), (0, CHAMFER_8_SIZE), (0, 0), align=None)
    extrude(amount=9.386006663, mode=Mode.SUBTRACT)

    # 倒角9: read off the stored shape, not the designer's step
    # 倒角9 outline → 倒角9 (cut)
    with BuildSketch(Plane(origin=(0, 0, 0), x_dir=(1, 0, 0), z_dir=(0, 0.7071067811865511, 0.7071067811865441)).offset(CHAMFER_START)):
        with Locations((0, -0.581118318)):
            Rectangle(CHAMFER_9_OUTLINE_W, CHAMFER_9_OUTLINE_H)
    extrude(amount=CHAMFER_9_DEPTH, mode=Mode.SUBTRACT)

    # Chamfer 9 2 outline → Chamfer 9 2 (cut)
    with BuildSketch(Plane(origin=(0, 0, 0), x_dir=(1, 0, 0), z_dir=(0, 0.7071067811865511, 0.7071067811865441)).offset(CHAMFER_START_2)):
        with Locations((0, -13.581118318)):
            Rectangle(CHAMFER_9_2_OUTLINE_W, CHAMFER_9_2_OUTLINE_H)
    extrude(amount=CHAMFER_9_2_DEPTH, mode=Mode.SUBTRACT)


solid = part.part
